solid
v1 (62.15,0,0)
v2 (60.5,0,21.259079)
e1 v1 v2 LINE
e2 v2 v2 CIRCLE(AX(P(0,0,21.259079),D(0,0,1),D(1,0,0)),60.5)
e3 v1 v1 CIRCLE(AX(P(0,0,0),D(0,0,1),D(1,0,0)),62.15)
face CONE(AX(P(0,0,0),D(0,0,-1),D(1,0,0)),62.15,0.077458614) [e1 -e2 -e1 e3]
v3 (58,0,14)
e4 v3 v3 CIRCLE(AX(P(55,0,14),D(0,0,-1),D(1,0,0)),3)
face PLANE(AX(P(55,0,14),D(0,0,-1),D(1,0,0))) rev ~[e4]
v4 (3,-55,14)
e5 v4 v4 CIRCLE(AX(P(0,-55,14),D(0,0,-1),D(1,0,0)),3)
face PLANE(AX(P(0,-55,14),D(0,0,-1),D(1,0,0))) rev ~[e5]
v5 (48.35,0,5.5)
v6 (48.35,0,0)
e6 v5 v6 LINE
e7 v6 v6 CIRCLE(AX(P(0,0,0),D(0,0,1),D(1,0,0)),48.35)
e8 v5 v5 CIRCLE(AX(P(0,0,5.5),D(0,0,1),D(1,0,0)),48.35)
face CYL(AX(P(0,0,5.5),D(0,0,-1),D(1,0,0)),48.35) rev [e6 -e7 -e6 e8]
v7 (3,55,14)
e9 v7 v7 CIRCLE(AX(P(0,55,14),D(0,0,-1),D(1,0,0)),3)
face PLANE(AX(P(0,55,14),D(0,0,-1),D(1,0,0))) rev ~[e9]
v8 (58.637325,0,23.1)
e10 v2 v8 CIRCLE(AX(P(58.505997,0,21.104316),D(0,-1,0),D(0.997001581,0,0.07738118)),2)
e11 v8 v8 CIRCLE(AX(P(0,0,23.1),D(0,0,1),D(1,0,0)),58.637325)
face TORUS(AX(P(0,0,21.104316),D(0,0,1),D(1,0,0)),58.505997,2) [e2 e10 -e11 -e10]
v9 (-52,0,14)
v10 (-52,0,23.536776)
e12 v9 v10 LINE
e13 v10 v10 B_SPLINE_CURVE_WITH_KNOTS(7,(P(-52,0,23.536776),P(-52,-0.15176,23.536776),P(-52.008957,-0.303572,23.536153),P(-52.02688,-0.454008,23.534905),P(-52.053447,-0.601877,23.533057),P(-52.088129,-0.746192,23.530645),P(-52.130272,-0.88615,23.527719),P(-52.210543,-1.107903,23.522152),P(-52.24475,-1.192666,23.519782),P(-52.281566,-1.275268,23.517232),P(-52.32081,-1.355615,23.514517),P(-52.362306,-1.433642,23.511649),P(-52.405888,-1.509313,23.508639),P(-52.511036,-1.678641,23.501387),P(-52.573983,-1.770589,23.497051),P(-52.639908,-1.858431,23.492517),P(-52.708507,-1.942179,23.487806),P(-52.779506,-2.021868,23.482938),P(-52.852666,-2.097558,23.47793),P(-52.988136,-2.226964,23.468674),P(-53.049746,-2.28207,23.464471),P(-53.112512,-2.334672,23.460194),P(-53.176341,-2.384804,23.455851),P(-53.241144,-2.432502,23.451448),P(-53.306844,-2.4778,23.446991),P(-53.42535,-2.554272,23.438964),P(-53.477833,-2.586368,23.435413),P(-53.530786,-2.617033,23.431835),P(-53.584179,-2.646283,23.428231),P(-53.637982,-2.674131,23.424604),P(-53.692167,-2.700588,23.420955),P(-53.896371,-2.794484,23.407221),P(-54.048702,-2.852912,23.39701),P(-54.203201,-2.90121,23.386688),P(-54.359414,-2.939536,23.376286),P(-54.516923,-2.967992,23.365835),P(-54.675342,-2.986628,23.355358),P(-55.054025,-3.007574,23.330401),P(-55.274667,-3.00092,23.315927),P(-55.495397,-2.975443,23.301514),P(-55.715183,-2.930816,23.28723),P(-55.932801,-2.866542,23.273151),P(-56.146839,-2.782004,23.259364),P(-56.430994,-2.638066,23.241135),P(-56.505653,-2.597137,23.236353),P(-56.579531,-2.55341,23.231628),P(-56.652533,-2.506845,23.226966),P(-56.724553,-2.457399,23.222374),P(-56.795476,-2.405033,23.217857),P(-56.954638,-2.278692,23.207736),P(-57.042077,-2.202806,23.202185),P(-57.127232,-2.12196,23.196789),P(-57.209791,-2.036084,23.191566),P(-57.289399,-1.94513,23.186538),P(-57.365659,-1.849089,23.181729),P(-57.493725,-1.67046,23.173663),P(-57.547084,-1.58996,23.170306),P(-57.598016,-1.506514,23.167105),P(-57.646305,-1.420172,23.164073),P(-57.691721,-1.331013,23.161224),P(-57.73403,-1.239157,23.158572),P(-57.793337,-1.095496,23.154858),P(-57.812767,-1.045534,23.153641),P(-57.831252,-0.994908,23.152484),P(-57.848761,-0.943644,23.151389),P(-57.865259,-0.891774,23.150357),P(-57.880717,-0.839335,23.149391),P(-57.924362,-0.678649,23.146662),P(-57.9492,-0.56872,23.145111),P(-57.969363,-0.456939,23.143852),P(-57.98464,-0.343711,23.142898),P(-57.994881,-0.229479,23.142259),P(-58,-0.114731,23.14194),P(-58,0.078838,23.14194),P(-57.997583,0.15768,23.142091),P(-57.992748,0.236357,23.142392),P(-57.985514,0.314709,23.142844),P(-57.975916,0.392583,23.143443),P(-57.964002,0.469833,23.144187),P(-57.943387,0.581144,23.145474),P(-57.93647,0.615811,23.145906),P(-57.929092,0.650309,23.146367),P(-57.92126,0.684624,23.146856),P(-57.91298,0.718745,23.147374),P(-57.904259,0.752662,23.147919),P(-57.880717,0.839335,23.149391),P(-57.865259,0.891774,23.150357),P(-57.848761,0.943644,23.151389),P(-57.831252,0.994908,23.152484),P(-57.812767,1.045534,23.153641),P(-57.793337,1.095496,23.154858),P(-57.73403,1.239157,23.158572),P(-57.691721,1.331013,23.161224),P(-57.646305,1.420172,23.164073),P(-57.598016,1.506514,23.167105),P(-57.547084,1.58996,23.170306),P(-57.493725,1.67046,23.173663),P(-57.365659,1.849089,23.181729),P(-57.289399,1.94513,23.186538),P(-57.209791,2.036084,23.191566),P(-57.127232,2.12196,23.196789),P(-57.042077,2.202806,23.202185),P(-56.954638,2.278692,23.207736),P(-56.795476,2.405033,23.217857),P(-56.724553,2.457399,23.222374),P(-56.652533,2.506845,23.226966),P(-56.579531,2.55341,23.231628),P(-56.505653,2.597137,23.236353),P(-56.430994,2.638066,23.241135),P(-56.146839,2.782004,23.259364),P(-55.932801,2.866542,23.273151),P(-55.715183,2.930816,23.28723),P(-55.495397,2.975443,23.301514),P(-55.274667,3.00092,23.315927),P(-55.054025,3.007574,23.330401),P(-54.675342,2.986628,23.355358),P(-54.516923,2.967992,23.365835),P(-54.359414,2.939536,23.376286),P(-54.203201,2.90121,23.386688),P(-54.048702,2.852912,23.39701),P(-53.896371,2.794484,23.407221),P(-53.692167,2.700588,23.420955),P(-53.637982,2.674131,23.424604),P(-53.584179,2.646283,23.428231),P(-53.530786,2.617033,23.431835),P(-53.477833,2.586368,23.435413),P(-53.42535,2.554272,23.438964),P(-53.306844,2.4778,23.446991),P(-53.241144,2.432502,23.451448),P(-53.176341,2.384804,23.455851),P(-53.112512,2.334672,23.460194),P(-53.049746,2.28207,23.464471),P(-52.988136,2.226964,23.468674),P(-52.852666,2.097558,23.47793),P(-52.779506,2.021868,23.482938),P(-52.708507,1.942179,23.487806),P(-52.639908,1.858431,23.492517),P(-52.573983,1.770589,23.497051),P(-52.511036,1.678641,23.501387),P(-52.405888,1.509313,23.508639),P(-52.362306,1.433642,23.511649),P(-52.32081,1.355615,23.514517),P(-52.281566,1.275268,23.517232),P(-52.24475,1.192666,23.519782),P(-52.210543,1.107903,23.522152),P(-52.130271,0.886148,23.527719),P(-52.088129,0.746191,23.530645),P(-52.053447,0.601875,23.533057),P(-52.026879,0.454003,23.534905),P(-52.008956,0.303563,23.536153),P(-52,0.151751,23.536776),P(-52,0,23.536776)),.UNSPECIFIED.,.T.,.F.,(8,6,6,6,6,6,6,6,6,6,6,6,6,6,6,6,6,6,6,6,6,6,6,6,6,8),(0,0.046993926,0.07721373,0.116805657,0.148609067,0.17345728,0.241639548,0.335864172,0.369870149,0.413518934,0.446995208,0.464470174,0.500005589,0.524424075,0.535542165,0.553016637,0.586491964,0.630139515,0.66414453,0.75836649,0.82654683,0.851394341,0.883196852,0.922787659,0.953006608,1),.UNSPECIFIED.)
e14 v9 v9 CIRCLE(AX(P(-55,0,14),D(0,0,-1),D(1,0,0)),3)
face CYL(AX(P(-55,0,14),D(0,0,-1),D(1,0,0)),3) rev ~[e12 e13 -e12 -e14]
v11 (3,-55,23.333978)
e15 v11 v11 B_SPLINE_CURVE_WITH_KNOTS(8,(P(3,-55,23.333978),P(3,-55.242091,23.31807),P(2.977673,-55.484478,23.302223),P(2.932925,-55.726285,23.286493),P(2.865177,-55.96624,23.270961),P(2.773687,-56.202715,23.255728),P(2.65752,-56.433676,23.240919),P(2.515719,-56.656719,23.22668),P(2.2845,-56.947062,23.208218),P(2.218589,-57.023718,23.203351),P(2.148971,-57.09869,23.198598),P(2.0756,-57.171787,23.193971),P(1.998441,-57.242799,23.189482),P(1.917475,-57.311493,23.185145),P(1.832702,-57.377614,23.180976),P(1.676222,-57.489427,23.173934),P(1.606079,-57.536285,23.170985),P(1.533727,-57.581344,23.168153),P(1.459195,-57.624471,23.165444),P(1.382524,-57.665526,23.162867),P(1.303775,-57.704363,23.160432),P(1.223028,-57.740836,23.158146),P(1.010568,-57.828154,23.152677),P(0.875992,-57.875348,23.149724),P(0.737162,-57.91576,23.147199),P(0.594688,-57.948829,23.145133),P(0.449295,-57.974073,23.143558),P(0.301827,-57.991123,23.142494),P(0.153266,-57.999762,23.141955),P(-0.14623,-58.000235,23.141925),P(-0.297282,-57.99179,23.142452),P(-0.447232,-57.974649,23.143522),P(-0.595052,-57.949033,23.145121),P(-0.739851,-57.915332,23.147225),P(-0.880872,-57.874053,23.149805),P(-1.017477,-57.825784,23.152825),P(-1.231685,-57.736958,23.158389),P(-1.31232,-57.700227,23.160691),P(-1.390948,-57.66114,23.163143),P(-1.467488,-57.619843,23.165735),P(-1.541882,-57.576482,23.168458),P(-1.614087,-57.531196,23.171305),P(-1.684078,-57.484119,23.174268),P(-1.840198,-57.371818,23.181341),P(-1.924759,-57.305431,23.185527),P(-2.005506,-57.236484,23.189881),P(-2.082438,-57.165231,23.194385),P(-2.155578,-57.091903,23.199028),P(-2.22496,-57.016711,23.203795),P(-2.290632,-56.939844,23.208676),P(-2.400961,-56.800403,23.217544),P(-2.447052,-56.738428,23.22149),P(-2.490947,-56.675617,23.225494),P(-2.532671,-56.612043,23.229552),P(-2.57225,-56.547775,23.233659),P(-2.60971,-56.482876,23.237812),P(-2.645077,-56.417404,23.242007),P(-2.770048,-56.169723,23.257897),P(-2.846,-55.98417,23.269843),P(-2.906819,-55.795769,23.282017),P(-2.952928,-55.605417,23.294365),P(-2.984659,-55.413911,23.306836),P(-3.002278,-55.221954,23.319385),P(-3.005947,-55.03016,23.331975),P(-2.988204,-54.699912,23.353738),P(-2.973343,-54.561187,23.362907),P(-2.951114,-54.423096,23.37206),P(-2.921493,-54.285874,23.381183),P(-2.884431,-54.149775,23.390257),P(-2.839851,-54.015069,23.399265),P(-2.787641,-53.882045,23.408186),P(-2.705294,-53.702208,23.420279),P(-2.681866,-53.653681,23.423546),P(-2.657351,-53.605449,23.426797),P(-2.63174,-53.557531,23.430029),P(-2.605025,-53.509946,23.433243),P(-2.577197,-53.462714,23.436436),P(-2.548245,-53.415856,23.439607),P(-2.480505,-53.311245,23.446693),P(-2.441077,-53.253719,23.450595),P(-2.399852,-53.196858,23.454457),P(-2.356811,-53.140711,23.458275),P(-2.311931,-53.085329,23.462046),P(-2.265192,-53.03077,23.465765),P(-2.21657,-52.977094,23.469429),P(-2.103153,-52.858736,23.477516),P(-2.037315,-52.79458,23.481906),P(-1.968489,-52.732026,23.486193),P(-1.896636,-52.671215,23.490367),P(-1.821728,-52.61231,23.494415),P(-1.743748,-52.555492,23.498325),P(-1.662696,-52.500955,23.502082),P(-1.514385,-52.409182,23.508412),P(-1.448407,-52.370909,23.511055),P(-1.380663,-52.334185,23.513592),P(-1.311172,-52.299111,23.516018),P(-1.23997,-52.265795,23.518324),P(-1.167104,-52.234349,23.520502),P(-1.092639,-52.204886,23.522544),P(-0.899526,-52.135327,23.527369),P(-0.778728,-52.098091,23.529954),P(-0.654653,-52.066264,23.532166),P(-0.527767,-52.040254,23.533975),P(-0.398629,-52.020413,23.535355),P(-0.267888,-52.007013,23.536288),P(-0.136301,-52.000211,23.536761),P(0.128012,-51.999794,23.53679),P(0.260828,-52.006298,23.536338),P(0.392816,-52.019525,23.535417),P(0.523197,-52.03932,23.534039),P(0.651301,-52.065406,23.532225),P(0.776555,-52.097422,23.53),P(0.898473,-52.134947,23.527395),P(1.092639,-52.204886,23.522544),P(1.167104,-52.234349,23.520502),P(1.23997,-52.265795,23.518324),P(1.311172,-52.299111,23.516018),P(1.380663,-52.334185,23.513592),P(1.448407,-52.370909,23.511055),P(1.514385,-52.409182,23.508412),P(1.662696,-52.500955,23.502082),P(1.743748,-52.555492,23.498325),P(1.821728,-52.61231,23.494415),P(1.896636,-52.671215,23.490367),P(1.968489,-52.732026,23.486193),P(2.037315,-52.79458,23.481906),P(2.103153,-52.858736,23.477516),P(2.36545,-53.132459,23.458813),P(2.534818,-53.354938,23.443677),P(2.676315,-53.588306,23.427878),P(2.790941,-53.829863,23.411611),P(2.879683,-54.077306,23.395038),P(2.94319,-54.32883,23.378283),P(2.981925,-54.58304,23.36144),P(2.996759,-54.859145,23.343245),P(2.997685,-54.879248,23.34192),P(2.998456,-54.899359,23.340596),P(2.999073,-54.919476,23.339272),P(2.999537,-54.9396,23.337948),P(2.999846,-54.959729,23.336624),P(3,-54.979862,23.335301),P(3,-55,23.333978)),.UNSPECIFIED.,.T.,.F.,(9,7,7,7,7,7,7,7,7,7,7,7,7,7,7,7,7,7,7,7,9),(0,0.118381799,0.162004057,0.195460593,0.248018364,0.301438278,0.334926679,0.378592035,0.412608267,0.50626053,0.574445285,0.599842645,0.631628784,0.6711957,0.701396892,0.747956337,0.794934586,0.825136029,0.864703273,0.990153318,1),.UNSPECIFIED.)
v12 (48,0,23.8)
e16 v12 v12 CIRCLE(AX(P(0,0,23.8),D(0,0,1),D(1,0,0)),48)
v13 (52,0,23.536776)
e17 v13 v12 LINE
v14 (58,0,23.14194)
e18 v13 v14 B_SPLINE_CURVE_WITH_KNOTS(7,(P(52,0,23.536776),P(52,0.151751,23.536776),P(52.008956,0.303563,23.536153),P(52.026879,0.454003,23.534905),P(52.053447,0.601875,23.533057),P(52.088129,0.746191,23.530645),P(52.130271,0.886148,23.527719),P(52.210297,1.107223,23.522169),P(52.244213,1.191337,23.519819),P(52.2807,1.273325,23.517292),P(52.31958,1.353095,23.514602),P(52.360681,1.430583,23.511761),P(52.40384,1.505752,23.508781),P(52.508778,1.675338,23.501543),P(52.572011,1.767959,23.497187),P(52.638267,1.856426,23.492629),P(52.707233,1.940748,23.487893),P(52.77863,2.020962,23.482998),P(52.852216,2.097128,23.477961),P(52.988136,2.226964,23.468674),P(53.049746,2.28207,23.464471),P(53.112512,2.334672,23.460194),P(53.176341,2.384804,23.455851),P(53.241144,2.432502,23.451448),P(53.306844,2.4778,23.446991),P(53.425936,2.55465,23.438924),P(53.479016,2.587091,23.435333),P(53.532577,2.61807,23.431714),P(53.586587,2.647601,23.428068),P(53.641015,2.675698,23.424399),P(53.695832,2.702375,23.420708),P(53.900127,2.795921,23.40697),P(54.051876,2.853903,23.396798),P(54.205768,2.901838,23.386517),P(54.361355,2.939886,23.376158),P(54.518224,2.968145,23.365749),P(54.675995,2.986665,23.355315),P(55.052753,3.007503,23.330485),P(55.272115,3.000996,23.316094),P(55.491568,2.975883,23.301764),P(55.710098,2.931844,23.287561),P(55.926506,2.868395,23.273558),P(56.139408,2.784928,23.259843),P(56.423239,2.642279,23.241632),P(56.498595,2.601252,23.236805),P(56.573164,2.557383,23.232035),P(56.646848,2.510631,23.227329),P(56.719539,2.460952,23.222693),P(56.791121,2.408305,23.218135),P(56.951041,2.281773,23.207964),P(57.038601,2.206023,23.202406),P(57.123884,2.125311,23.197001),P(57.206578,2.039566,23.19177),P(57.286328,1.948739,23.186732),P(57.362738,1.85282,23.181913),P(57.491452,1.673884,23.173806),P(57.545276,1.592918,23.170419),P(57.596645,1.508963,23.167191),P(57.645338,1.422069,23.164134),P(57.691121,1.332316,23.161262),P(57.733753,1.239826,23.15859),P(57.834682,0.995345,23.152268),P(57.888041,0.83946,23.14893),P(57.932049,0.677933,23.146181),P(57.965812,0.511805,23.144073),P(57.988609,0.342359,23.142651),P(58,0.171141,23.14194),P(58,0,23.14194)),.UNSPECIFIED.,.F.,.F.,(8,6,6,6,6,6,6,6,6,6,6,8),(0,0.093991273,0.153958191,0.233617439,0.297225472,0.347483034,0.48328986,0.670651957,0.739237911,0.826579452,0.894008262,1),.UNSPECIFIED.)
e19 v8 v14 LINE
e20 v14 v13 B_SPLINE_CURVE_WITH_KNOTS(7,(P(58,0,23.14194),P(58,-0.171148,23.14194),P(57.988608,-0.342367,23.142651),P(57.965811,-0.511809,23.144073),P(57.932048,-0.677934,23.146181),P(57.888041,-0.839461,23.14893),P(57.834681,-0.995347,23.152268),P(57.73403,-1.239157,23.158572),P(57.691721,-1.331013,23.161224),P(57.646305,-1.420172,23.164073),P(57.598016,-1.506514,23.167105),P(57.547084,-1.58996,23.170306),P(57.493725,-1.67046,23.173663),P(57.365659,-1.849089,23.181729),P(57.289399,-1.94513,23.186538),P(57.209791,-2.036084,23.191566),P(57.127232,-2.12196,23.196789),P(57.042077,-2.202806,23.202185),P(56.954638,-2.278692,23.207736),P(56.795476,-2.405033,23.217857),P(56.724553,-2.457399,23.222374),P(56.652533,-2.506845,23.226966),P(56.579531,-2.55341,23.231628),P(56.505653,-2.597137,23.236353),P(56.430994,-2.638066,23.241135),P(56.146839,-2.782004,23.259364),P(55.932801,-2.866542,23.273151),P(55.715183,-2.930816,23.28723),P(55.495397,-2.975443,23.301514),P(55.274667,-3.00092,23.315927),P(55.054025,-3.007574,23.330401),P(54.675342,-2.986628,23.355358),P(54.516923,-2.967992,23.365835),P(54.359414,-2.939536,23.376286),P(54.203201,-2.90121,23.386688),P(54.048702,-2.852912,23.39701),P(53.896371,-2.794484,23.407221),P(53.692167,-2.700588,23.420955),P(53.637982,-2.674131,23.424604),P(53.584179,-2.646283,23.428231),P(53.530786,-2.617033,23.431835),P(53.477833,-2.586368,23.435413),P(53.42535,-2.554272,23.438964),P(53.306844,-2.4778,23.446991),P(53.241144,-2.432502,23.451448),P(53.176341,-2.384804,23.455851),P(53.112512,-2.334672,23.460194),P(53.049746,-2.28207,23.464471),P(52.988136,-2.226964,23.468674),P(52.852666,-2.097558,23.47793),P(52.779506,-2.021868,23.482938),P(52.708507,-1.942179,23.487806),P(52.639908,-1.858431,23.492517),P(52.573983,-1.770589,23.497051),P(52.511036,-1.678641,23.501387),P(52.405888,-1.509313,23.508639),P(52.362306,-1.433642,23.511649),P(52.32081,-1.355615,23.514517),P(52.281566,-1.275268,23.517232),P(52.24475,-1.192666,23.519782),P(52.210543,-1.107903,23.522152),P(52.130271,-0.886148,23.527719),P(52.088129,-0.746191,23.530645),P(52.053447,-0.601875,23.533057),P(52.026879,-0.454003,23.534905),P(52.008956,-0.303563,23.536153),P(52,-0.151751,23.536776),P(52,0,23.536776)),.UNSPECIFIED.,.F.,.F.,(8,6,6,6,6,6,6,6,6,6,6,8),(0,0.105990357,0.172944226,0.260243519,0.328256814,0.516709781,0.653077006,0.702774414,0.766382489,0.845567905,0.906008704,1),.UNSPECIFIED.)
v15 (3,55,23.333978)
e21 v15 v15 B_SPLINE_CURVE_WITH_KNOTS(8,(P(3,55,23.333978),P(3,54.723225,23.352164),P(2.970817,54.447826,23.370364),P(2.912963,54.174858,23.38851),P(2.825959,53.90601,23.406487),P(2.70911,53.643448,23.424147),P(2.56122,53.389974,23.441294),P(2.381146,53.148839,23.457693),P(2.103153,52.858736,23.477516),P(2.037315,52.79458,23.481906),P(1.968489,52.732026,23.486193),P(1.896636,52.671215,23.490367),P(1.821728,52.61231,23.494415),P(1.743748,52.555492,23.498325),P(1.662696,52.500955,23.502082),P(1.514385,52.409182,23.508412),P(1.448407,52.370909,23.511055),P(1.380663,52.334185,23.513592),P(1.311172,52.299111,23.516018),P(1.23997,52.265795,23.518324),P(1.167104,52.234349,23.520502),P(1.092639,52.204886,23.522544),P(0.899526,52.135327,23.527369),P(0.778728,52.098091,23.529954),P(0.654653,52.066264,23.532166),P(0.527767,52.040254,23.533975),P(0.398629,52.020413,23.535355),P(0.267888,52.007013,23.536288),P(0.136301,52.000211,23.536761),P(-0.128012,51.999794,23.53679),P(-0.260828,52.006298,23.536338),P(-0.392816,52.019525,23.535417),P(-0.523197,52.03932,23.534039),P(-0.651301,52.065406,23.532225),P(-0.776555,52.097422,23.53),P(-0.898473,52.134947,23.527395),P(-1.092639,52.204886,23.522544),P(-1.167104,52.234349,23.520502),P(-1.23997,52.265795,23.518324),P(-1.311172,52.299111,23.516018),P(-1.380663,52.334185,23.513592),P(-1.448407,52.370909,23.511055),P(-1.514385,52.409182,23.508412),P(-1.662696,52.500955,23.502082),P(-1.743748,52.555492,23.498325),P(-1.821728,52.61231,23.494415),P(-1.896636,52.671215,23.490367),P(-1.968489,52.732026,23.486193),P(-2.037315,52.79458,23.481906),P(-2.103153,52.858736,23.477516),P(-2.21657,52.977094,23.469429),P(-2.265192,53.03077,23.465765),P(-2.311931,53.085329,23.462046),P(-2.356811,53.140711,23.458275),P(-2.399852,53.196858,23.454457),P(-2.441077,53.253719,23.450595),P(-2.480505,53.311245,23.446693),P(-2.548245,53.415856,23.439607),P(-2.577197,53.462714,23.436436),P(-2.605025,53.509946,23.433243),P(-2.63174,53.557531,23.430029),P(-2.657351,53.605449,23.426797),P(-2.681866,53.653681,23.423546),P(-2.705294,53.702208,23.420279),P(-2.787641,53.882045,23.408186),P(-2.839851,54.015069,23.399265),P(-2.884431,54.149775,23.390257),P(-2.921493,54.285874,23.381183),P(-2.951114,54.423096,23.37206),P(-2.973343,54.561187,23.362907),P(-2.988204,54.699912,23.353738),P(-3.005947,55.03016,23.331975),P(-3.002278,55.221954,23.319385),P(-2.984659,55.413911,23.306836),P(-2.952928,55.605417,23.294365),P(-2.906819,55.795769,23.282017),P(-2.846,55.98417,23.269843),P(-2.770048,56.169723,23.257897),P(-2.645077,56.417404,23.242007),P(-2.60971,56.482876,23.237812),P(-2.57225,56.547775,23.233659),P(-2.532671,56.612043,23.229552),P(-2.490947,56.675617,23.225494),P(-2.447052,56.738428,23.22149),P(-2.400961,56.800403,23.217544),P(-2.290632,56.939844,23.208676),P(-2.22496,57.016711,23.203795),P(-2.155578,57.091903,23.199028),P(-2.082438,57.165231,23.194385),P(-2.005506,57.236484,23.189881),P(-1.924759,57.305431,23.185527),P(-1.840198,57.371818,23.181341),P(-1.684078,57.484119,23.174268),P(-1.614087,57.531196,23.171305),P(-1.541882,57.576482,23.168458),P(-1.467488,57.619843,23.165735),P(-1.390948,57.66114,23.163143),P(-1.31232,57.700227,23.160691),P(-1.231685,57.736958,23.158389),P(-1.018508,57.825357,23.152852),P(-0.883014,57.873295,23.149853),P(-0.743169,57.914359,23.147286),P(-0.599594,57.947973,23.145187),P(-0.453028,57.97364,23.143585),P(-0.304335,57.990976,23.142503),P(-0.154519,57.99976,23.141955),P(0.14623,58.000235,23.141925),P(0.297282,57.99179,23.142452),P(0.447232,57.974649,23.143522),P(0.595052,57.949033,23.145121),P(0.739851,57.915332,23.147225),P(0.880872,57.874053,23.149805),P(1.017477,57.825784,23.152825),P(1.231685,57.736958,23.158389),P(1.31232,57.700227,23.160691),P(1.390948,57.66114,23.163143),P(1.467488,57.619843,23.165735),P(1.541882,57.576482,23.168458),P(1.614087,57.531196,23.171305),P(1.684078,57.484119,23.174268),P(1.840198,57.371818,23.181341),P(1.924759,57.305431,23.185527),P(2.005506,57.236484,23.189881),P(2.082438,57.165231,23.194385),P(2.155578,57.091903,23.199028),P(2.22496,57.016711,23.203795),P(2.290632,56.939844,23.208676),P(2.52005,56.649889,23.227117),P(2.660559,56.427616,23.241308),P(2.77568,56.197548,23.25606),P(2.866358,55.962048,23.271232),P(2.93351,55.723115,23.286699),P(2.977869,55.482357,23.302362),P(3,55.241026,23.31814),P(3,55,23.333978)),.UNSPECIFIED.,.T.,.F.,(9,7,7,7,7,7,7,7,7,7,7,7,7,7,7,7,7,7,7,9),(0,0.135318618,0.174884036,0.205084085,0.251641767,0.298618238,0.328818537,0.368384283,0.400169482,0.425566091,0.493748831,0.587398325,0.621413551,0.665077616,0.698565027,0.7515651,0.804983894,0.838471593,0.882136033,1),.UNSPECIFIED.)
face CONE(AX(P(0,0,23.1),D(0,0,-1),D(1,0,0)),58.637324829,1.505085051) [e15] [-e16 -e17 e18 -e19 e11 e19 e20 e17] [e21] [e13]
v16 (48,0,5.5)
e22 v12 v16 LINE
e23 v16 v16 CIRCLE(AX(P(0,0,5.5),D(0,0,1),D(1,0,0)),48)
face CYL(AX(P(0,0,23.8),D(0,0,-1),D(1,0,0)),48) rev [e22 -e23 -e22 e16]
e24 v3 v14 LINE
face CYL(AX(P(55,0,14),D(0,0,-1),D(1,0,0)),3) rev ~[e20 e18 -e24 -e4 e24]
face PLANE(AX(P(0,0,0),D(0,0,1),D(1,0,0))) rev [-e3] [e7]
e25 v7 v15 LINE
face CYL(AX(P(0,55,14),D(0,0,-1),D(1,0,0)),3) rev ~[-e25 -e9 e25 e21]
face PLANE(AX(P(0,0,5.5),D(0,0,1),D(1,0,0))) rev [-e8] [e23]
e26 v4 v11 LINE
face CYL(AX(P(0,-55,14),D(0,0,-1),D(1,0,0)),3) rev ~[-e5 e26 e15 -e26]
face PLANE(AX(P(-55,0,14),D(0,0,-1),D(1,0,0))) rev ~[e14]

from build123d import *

# Parameters (mm, degrees)
F3_START = -14
F2_R     = 3
F3_DEPTH = 10


with BuildPart() as f1:
    # F0 (on Front) → F1 (revolve)
    with BuildSketch(Plane.XZ):
        with BuildLine():
            Line((48.35, 0), (62.15, 0))
            Line((62.15, 0), (60.5, 21.2590787789))
            ThreePointArc((60.5, 21.2590787789), (59.9118794302, 22.5268121601), (58.6373248293, 23.1))
            Line((58.6373248293, 23.1), (48, 23.8))
            Line((48, 23.8), (48, 5.5))
            Line((48, 5.5), (48.35, 5.5))
            Line((48.35, 5.5), (48.35, 0))
        make_face()
    revolve(axis=Axis((0, 0, 11.9790900654), (0, 0, 1)))

    # F2 (on face) → F3 (cut)
    with BuildSketch(Plane(origin=(0, 0, 0), x_dir=(1, 0, 0), z_dir=(0, 0, -1)).offset(F3_START)):
        with Locations((-55, 0)):
            Circle(F2_R)
        with Locations((0, 55)):
            Circle(F2_R)
        with Locations((55, 0)):
            Circle(F2_R)
        with Locations((0, -55)):
            Circle(F2_R)
    extrude(amount=-F3_DEPTH, mode=Mode.SUBTRACT)


solid = f1.part
